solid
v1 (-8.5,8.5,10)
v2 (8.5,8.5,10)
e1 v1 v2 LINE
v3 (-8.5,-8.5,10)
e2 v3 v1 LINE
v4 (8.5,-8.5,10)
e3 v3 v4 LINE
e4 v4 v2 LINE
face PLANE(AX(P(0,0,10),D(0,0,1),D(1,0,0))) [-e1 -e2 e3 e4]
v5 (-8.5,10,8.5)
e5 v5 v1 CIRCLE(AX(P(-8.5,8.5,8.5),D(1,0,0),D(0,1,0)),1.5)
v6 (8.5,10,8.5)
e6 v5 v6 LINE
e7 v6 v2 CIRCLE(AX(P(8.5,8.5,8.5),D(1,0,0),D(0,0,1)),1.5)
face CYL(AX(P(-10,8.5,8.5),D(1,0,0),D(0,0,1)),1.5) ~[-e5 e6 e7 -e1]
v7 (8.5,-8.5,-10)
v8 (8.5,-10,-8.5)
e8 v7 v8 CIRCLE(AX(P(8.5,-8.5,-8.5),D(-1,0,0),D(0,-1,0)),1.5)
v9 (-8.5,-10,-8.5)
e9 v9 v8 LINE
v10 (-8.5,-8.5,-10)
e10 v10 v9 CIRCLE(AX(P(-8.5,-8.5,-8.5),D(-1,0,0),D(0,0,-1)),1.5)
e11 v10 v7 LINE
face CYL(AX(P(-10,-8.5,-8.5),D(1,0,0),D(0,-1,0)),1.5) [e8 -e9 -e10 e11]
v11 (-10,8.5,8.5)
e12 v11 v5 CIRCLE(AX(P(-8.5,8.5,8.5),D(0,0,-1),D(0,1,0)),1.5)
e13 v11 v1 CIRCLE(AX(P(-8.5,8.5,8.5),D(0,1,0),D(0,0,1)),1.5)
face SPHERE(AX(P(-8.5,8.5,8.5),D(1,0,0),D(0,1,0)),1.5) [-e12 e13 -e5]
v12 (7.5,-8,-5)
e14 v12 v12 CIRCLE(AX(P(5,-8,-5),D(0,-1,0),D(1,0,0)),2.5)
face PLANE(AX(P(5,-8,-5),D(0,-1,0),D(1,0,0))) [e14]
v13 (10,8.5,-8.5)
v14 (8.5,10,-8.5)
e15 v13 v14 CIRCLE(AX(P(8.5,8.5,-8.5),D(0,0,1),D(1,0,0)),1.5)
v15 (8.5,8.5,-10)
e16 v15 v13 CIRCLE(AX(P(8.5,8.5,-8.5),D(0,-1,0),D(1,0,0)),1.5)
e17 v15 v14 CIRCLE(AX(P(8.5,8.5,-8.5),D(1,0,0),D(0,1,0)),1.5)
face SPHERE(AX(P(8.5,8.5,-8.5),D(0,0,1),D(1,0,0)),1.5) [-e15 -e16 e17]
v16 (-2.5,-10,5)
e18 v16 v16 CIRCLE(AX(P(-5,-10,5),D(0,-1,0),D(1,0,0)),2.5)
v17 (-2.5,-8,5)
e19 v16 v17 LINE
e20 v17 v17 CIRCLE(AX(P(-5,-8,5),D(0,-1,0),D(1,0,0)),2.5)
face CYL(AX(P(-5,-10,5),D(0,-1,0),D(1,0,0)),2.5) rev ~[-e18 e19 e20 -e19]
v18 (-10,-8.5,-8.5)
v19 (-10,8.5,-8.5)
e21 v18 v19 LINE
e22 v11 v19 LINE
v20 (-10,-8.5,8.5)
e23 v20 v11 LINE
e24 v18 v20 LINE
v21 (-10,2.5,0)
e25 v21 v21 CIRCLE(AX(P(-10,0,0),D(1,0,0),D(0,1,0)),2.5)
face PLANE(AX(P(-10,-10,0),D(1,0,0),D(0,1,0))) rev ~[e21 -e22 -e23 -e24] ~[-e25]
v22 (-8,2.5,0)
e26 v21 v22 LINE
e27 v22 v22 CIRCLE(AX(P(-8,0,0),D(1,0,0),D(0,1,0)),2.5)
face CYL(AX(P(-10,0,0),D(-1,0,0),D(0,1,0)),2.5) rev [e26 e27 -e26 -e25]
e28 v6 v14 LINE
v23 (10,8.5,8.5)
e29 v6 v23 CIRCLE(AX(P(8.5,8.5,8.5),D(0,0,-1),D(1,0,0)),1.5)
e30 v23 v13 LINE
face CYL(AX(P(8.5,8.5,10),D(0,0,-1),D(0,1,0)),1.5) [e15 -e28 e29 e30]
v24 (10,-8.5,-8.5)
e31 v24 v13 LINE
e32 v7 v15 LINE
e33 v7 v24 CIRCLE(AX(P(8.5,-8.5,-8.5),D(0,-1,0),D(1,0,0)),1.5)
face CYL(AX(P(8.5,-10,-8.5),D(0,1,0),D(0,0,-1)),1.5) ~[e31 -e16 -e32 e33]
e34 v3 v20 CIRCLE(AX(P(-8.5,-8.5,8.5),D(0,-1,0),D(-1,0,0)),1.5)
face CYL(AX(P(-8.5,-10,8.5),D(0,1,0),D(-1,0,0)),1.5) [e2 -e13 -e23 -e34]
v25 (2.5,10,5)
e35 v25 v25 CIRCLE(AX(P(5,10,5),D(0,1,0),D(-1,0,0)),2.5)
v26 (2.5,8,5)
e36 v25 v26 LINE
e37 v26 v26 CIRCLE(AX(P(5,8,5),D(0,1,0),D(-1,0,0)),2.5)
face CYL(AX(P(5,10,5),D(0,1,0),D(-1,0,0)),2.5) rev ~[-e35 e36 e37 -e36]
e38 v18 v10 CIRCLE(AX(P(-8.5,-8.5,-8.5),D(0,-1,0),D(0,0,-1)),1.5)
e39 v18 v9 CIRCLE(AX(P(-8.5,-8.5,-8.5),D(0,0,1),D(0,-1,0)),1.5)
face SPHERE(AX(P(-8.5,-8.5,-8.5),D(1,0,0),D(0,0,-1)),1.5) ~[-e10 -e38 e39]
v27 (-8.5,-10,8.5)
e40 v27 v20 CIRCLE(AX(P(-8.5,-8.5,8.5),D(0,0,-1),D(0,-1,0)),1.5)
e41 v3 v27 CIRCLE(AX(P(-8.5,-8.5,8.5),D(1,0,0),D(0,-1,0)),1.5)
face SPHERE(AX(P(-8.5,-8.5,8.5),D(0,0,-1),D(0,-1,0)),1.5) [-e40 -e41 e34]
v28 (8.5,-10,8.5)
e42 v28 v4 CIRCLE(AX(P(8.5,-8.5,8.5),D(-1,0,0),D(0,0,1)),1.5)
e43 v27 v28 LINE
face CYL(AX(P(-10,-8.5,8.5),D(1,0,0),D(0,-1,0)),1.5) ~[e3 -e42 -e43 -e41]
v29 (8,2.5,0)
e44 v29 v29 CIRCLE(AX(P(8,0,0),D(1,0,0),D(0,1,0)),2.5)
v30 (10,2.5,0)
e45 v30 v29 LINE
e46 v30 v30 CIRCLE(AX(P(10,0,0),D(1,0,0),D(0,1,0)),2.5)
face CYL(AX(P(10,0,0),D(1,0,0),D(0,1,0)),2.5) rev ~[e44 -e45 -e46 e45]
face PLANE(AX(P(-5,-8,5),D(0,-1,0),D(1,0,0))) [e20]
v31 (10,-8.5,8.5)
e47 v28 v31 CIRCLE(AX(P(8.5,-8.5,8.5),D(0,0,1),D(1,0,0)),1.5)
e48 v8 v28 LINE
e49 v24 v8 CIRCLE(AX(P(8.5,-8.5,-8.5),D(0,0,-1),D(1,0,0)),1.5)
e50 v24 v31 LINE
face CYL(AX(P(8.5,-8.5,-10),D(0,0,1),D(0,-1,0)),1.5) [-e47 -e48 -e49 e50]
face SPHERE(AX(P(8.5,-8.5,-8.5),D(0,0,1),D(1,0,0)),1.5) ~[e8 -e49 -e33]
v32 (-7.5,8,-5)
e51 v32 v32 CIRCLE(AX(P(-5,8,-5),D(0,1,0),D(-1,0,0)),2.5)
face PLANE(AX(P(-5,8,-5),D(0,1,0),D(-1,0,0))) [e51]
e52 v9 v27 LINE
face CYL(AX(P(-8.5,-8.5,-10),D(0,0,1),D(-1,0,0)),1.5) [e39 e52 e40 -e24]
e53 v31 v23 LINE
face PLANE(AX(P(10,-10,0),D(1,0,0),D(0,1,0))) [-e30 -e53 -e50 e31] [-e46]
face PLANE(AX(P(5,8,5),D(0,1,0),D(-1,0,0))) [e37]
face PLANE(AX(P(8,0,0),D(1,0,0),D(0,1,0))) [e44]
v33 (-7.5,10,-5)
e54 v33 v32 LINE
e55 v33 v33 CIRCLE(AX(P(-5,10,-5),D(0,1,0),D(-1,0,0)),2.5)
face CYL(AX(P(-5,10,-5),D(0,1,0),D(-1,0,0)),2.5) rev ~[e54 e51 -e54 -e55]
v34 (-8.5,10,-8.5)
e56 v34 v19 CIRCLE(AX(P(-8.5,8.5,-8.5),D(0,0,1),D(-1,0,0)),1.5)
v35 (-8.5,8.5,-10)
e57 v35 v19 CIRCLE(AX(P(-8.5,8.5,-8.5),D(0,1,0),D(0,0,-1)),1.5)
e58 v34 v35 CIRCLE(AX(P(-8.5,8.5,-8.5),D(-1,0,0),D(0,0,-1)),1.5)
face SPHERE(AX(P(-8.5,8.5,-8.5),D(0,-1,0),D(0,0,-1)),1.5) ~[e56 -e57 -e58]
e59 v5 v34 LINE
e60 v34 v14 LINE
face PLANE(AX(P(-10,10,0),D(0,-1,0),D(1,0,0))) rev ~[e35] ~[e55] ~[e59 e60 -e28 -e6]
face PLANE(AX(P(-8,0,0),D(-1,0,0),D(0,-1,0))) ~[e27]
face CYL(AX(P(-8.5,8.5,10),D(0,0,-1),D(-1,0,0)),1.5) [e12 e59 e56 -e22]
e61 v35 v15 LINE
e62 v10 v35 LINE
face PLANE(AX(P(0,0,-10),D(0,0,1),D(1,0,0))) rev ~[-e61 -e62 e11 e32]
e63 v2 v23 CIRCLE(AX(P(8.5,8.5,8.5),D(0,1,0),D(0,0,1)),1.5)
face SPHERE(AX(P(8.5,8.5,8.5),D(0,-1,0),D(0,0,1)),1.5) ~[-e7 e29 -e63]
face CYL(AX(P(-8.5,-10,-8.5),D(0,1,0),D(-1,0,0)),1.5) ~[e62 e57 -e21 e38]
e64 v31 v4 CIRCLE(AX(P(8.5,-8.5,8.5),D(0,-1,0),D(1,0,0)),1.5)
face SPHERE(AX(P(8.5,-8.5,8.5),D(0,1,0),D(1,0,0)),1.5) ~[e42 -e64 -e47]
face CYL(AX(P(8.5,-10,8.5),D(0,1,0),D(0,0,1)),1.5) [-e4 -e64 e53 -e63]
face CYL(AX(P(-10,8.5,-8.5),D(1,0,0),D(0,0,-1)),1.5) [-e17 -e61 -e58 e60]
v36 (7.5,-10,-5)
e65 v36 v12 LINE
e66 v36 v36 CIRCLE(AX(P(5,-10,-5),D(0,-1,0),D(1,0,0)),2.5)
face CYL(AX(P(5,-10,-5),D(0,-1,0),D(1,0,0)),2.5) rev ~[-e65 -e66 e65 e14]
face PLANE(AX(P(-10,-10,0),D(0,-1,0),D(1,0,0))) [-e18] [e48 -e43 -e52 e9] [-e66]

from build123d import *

# Parameters (mm, degrees)
F0_W     = 20
F0_H     = 20
F1_DEPTH = 10
F2_R     = 2.5
F3_DEPTH = 2
F4_R     = 2.5
F5_DEPTH = 2
F6_R     = 2.5
F7_DEPTH = 2
F8_R     = 1.5


# Not quite as in the source:
# - a pattern or mirror of a feature is missing from the dataset's text; its kind, count and spacing are read off the source's solid


with BuildPart() as f1:
    # F0 (on Top) → F1 (new body, symmetric)
    with BuildSketch(Plane.XY):
        Rectangle(F0_W, F0_H)
    extrude(amount=F1_DEPTH, both=True)

    # F2 (on face) → F3 (cut)
    with BuildSketch(Plane.YZ.offset(10)):
        Circle(F2_R)
    f3 = extrude(amount=-F3_DEPTH, mode=Mode.SUBTRACT)

    # F3_copies: F3 across plane
    add(f3.mirror(Plane(origin=(0, 0, 0), x_dir=(0, 0, -1), z_dir=(-1, 0, 0))), mode=Mode.SUBTRACT)

    # F4 (on face) → F5 (cut)
    with BuildSketch(Plane(origin=(0, 10, 0), x_dir=(-1, 0, 0), z_dir=(0, 1, 0))):
        with Locations((5, -5)):
            Circle(F4_R)
        with Locations((-5, 5)):
            Circle(F4_R)
    extrude(amount=-F5_DEPTH, mode=Mode.SUBTRACT)

    # F6 (on face) → F7 (cut)
    with BuildSketch(Plane.XZ.offset(10)):
        with Locations((-5, 5)):
            Circle(F6_R)
        with Locations((5, -5)):
            Circle(F6_R)
    extrude(amount=-F7_DEPTH, mode=Mode.SUBTRACT)

    # F8
    f8_edges = [f1.edges().sort_by_distance(p)[0] for p in [
        (10, 0, 10),
        (0, 10, 10),
        (10, 10, 0),
        (10, -10, 0),
        (10, 0, -10),
        (0, -10, -10),
        (-10, 0, -10),
        (0, 10, -10),
        (-10, 10, 0),
        (-10, -10, 0),
        (0, -10, 10),
        (-10, 0, 10),
    ]]
    fillet(f8_edges, radius=F8_R)


solid = f1.part
